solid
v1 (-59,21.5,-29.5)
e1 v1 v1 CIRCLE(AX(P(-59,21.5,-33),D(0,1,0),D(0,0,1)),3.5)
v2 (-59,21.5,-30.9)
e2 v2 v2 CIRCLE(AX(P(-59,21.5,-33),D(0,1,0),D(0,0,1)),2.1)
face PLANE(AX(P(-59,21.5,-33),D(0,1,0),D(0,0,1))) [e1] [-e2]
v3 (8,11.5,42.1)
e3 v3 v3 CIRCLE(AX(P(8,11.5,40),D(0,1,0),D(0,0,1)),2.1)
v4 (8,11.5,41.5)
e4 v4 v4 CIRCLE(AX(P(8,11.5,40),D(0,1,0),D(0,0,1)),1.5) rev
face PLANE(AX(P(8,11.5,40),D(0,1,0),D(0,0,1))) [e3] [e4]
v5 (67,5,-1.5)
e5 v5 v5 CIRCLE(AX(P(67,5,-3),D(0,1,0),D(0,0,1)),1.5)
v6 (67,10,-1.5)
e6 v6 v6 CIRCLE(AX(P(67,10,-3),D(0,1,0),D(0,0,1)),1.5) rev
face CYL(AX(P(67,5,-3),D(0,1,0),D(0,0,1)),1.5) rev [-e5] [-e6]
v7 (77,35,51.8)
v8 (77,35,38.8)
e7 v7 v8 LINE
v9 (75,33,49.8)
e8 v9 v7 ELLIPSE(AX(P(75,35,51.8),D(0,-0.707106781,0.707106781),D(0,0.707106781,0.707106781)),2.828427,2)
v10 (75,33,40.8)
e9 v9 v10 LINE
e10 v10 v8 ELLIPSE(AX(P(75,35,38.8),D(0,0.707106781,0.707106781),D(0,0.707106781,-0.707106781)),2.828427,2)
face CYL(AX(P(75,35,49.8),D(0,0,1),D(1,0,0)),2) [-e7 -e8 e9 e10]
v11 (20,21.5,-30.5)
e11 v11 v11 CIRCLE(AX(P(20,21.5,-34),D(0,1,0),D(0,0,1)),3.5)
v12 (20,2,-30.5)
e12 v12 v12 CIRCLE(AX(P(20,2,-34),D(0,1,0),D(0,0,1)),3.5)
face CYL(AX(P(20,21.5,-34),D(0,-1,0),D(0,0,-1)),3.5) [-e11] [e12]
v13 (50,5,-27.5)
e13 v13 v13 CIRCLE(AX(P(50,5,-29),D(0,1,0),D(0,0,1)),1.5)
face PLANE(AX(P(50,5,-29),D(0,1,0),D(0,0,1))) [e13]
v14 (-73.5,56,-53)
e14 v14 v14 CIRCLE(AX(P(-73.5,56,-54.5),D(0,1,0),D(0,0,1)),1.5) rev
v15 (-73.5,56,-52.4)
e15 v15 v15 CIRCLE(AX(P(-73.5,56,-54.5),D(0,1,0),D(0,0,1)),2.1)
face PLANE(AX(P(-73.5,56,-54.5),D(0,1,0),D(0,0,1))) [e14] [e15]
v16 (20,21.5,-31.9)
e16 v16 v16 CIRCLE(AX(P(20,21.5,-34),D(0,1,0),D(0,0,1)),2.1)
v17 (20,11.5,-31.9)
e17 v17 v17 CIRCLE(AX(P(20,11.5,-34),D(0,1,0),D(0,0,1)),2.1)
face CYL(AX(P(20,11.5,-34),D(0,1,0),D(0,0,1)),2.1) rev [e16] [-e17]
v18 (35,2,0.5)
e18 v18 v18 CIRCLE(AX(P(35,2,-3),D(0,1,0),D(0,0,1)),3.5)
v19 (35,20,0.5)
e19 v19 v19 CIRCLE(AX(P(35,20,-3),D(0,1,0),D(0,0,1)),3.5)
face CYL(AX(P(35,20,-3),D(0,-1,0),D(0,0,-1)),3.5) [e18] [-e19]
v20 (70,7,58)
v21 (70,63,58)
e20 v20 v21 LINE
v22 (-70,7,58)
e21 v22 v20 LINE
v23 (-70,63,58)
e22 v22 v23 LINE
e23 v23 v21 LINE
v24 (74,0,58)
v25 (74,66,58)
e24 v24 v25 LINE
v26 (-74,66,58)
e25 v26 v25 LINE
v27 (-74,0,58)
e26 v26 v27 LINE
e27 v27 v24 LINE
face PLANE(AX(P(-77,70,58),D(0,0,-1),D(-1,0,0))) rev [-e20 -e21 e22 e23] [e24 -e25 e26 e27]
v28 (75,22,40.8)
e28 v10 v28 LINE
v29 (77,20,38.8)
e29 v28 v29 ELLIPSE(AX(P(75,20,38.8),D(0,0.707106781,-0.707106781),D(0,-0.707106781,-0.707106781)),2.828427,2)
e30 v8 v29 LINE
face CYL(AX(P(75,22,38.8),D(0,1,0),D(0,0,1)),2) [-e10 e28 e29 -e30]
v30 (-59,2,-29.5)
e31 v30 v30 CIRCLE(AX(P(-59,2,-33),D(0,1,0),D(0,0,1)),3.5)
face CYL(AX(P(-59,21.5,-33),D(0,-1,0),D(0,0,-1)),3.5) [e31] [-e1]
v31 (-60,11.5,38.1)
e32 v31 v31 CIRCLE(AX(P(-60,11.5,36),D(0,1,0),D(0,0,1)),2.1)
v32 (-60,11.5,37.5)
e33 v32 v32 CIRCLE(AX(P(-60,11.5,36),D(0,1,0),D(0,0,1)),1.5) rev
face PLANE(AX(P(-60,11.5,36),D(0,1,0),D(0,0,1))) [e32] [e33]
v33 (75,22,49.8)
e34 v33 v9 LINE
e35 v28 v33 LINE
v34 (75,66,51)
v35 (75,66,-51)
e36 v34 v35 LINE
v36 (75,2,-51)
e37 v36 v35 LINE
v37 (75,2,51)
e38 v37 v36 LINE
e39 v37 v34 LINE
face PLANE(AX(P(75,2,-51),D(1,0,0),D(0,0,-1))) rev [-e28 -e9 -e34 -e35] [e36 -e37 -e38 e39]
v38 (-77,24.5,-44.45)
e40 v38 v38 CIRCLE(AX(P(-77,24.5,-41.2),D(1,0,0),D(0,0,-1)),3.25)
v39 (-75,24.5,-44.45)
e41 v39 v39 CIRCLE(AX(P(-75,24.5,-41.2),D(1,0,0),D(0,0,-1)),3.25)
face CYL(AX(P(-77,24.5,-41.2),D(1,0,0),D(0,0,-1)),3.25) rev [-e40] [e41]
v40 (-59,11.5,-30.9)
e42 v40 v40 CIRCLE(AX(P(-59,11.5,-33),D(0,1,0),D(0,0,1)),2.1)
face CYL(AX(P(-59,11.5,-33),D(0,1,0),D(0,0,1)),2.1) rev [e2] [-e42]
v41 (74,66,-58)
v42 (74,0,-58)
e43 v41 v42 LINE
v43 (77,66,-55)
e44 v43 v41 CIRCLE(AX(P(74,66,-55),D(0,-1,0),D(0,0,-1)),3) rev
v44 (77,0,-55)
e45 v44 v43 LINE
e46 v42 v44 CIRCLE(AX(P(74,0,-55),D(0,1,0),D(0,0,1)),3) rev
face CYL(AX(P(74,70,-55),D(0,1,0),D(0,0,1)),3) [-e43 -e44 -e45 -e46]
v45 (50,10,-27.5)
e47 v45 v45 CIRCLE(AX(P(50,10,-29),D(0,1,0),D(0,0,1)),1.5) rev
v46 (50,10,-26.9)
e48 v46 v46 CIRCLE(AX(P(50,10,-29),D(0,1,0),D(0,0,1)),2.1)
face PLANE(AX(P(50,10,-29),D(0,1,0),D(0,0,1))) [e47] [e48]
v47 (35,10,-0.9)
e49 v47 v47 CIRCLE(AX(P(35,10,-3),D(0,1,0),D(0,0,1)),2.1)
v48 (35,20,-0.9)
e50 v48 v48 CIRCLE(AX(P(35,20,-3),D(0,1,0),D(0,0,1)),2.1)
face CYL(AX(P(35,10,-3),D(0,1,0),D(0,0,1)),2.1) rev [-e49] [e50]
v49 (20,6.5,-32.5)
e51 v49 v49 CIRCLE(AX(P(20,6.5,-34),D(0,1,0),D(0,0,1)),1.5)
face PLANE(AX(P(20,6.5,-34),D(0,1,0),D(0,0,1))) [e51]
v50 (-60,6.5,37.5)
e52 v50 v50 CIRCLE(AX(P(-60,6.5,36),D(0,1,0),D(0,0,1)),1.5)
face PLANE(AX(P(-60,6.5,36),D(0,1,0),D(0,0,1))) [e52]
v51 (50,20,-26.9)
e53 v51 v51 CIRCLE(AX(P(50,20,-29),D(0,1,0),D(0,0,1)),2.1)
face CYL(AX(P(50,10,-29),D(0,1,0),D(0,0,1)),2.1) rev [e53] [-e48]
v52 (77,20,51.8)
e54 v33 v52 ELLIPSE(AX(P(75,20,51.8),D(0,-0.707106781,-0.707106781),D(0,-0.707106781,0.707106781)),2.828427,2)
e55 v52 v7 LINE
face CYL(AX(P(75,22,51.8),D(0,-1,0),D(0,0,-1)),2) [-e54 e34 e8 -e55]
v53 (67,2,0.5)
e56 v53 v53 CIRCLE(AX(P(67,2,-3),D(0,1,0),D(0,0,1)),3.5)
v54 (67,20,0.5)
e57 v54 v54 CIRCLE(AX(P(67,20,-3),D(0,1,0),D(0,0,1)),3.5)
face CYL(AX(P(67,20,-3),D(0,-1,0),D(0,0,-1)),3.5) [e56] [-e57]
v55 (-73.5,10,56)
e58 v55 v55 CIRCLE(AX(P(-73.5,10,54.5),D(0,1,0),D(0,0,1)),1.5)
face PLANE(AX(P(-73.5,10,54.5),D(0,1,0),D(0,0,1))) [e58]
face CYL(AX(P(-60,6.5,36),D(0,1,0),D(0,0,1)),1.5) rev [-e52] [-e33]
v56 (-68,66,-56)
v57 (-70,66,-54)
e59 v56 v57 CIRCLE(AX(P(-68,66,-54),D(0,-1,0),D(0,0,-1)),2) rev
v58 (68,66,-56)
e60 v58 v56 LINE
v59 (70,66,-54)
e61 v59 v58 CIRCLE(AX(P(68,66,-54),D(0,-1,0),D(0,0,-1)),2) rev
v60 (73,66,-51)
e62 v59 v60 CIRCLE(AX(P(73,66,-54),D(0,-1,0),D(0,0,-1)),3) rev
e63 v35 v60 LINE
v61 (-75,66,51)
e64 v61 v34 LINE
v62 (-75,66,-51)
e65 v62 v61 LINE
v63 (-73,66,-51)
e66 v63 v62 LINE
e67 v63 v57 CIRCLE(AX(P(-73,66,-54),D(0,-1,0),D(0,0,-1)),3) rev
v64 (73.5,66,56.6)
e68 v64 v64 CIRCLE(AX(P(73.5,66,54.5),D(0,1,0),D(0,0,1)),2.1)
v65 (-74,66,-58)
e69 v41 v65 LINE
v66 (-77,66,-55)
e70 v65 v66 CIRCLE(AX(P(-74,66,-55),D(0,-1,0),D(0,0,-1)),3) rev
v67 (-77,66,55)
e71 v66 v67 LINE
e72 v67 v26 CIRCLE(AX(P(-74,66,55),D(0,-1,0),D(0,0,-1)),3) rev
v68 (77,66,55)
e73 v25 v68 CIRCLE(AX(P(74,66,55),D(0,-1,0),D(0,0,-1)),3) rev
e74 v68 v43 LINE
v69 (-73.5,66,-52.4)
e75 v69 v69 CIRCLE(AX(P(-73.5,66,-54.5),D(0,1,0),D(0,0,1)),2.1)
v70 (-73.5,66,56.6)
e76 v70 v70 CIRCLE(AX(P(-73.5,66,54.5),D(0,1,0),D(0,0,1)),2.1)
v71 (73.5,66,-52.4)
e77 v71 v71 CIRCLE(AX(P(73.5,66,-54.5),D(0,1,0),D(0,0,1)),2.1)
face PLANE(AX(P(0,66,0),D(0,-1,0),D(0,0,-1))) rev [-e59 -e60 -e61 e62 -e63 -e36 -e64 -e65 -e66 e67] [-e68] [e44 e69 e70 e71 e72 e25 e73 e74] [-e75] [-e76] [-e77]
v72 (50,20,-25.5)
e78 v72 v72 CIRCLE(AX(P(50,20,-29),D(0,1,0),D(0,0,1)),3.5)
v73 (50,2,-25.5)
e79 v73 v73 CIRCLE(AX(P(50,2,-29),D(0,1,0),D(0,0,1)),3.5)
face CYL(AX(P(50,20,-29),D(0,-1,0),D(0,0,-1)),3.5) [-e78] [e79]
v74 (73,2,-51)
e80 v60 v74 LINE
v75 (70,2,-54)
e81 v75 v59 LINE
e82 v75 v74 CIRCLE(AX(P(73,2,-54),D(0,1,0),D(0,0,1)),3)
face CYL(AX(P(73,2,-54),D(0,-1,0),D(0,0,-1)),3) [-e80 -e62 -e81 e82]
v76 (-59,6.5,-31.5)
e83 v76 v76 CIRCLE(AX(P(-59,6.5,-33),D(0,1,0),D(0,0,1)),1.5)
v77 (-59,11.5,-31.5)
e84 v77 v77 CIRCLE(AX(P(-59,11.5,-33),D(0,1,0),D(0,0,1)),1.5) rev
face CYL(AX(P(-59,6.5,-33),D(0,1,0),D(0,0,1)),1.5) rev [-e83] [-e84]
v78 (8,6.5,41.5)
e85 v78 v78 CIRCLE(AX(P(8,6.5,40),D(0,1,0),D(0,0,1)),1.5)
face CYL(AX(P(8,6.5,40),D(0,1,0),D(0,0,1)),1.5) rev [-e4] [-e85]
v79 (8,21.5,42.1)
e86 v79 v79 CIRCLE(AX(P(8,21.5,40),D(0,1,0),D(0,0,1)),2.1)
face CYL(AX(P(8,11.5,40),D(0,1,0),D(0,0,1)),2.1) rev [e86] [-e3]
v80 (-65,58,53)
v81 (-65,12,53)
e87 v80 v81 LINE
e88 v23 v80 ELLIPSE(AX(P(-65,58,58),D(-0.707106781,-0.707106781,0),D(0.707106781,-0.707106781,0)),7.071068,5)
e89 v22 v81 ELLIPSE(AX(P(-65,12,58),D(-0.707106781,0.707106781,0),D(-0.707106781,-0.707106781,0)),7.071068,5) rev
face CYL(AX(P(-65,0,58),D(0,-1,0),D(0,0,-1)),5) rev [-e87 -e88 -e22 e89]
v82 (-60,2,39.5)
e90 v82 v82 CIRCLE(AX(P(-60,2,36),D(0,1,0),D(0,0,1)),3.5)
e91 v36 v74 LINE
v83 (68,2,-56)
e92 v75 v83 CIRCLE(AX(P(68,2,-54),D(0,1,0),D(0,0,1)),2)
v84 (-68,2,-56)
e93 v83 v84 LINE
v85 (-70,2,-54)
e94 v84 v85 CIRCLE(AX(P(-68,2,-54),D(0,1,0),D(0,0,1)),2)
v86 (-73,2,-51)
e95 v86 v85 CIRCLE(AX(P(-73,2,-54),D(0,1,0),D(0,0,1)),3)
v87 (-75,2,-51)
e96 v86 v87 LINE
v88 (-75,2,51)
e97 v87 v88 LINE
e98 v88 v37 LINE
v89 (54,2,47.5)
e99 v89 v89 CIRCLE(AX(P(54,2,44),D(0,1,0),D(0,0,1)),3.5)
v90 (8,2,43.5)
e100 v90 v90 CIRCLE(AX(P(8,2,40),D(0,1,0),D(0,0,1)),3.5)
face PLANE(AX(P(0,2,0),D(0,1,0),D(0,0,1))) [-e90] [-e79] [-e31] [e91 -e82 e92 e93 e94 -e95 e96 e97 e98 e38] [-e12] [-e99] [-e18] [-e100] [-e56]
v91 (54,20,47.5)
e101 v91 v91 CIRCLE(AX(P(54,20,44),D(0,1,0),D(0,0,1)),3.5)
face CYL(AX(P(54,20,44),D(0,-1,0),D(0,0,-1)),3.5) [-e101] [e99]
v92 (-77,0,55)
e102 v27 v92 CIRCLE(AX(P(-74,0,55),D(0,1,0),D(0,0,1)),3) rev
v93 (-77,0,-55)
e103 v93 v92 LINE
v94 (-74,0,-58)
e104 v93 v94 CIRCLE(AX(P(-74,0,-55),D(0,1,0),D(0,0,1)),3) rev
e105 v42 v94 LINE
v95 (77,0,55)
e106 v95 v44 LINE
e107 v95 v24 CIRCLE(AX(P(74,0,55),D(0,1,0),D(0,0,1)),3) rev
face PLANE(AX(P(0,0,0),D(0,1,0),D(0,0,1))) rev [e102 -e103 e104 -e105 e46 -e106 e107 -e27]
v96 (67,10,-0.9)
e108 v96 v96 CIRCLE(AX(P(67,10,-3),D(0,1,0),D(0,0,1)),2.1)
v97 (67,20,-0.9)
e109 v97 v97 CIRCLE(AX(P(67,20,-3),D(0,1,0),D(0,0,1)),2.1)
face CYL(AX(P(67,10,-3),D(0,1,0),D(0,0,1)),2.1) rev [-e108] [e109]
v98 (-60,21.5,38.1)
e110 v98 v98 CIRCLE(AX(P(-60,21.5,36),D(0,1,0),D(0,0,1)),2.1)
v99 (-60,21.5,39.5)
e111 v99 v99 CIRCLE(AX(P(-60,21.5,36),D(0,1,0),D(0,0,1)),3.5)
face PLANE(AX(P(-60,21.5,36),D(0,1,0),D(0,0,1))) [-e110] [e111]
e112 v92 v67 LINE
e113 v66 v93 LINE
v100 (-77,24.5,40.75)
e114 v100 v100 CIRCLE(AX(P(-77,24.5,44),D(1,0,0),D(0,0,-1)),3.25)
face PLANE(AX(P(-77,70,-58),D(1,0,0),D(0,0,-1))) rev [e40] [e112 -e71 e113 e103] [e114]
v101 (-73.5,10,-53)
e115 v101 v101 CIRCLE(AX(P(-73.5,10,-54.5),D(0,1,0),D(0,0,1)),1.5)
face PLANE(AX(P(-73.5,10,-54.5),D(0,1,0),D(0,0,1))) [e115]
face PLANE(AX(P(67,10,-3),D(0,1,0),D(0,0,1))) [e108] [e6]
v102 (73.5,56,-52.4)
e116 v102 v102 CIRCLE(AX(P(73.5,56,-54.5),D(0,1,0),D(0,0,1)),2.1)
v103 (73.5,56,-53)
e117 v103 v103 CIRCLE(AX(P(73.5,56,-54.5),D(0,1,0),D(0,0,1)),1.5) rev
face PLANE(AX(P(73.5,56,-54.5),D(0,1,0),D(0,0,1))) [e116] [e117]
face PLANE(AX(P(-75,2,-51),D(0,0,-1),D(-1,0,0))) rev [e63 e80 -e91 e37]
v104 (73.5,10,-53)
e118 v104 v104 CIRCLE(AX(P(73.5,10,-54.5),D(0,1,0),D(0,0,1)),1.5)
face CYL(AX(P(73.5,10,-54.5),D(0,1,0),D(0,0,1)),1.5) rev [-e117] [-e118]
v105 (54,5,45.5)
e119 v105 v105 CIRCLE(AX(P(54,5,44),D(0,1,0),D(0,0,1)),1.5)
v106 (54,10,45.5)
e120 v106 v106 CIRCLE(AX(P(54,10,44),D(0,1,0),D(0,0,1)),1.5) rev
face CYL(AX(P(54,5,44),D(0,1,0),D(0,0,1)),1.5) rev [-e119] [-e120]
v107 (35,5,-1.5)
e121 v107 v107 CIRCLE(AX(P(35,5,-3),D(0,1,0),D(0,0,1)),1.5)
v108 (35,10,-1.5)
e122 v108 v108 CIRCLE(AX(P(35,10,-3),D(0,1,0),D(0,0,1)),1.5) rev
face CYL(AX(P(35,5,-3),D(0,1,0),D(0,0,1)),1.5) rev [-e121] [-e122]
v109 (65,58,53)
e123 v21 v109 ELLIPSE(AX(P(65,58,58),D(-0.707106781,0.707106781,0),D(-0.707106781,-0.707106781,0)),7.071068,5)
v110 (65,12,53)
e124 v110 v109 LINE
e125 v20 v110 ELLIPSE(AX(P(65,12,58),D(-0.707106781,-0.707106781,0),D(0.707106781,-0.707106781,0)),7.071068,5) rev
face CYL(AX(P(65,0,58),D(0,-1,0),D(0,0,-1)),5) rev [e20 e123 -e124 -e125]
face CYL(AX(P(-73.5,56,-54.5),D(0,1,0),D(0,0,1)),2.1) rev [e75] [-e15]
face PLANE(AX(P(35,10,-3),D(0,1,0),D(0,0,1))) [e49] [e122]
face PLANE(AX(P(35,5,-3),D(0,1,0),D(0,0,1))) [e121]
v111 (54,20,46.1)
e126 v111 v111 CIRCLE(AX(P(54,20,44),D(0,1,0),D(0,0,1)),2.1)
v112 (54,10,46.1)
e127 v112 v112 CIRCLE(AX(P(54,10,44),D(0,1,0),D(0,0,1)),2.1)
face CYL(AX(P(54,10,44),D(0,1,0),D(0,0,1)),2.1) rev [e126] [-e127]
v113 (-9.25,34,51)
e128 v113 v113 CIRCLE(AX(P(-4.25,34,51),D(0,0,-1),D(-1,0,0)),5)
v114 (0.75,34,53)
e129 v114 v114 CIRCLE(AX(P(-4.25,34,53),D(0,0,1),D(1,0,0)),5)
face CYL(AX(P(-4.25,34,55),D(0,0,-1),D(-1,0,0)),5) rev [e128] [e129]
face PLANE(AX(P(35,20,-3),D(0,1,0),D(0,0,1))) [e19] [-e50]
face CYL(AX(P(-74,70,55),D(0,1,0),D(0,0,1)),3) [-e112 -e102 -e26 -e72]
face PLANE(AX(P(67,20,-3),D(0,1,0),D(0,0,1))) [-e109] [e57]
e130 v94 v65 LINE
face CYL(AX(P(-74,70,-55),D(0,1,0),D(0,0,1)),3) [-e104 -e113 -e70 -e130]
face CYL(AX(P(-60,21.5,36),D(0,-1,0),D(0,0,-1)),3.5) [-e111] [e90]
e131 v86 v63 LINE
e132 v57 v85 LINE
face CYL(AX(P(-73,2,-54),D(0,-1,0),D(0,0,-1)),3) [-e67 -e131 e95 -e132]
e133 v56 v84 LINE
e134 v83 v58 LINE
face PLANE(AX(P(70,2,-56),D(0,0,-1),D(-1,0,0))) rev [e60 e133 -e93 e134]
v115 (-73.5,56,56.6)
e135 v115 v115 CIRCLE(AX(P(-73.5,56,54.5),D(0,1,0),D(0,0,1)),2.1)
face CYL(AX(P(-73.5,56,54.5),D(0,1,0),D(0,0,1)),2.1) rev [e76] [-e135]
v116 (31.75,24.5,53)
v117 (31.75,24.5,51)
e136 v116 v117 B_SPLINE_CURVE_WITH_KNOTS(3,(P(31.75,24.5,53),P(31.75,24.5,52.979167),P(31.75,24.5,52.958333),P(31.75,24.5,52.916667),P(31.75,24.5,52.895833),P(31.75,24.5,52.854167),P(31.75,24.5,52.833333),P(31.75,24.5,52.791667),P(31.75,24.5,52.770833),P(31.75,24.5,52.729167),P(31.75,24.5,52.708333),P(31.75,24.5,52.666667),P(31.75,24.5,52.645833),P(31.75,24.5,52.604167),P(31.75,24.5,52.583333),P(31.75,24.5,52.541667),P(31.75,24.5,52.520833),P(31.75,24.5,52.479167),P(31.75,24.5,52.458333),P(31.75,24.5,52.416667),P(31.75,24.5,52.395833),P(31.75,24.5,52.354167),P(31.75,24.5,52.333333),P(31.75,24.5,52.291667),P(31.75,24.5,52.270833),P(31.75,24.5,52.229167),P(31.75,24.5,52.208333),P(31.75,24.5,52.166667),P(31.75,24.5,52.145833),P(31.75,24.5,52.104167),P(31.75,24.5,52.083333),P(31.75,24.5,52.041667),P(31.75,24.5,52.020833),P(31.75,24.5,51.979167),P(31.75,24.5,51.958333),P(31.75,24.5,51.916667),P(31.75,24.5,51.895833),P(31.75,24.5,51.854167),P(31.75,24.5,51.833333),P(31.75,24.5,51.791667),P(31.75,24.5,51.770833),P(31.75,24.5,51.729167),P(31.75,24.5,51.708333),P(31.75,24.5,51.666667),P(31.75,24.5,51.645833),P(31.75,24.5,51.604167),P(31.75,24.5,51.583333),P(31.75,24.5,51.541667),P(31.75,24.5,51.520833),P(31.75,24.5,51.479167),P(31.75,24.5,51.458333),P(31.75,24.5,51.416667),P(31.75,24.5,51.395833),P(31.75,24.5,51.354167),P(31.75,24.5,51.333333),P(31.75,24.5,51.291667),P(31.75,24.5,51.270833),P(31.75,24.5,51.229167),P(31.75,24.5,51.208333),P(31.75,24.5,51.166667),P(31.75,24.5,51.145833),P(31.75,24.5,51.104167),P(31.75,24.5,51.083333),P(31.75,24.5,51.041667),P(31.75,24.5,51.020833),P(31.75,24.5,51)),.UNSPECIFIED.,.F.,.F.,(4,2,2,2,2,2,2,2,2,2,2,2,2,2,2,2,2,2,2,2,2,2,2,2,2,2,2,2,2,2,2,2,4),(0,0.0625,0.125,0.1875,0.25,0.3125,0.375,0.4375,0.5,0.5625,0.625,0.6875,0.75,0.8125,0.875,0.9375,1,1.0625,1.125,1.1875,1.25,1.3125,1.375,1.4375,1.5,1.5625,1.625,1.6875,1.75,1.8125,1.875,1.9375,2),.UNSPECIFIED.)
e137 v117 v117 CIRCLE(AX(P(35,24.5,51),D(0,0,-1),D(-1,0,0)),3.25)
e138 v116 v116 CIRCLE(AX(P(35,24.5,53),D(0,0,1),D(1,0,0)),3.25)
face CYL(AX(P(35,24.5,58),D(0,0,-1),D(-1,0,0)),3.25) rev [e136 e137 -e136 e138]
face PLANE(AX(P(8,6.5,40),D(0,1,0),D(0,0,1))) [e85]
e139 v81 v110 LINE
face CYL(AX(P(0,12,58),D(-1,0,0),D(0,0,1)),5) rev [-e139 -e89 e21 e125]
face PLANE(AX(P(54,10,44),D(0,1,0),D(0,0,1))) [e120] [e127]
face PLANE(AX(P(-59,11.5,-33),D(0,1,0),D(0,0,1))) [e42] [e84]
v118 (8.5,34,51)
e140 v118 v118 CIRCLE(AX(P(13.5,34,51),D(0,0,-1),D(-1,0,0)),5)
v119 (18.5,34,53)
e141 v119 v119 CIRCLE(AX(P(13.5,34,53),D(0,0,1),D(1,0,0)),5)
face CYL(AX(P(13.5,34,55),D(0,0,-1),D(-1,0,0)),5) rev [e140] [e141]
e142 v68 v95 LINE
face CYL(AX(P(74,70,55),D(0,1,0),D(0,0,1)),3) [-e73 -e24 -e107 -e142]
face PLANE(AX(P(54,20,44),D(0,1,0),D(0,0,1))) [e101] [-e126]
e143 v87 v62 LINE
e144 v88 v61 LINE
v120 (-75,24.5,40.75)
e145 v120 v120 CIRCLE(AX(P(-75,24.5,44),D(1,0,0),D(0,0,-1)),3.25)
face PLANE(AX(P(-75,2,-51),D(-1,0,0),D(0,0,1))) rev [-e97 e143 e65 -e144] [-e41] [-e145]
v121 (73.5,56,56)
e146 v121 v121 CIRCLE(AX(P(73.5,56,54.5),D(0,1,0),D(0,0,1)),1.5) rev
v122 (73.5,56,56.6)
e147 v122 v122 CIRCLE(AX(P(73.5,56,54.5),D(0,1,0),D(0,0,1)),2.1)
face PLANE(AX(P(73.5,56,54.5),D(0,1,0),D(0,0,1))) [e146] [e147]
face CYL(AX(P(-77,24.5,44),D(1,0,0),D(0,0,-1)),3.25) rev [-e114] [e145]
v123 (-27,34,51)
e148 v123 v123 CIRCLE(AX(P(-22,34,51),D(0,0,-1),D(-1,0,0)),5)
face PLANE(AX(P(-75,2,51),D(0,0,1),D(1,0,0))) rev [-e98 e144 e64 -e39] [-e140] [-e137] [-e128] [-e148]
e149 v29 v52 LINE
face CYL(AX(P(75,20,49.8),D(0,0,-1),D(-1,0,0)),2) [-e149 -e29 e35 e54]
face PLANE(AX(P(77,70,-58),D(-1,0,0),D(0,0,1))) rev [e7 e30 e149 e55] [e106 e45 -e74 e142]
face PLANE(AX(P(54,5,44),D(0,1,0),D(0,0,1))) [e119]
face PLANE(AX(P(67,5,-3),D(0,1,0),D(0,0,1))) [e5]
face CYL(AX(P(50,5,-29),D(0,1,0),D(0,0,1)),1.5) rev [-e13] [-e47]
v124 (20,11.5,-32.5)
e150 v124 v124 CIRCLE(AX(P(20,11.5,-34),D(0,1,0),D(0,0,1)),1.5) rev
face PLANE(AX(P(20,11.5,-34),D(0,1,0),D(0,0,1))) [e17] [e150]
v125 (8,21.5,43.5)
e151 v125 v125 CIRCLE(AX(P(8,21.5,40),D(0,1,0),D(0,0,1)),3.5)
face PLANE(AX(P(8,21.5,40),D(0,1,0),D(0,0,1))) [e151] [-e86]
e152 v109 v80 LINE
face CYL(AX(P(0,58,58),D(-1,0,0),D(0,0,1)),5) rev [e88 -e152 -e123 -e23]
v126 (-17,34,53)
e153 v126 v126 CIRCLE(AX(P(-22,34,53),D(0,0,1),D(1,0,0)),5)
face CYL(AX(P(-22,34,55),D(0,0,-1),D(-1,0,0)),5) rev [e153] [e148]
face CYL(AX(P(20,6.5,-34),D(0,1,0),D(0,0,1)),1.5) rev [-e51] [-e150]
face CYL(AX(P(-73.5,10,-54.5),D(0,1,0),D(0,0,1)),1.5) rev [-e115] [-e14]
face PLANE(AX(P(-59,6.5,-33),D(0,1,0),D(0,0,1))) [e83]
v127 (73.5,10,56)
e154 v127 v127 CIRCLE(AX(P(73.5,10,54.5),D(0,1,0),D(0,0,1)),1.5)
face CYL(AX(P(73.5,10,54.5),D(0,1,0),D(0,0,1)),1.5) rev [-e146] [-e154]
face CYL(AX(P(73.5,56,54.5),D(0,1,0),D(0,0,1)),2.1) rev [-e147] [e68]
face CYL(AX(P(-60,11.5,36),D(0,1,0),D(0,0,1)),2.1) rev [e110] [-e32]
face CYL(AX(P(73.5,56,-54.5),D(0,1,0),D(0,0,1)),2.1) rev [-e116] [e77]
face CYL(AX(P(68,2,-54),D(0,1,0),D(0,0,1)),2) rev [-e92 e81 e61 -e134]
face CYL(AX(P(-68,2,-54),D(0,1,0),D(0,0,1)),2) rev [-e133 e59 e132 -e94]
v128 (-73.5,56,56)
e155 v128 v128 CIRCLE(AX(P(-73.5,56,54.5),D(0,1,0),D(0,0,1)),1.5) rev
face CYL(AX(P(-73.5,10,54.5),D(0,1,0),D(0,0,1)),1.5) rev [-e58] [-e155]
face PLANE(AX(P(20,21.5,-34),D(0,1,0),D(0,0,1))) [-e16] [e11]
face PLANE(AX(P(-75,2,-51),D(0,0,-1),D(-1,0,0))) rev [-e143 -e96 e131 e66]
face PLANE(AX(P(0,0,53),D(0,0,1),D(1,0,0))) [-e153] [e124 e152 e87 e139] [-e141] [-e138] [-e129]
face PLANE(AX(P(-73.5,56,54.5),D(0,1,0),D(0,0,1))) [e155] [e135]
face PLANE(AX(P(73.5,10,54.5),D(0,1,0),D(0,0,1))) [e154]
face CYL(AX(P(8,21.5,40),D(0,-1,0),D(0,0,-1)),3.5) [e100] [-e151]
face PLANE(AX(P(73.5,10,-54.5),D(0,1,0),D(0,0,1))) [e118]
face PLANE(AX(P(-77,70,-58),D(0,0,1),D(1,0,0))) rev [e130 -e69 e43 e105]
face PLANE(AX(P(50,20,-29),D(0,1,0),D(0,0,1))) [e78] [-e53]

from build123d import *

# Parameters (mm, degrees)
SKETCH1_W           = 154
SKETCH1_H           = 116
BOSS_EXTRUDE1_DEPTH = 70
SKETCH2_W           = 150
SKETCH2_H           = 102
CUT_EXTRUDE1_DEPTH  = 68
SKETCH3_W           = 140
SKETCH3_H           = 5
CUT_EXTRUDE2_DEPTH  = 68
SKETCH5_W           = 70
SKETCH5_H           = 56
CUT_EXTRUDE4_DEPTH  = 5
SKETCH17_W          = 9
SKETCH17_H          = 11
CUT_EXTRUDE12_DEPTH = 178.110135227
FILLET1_R           = 2
FILLET3_R           = 5
FILLET4_R           = 3
FILLET5_R           = 3
FILLET6_R           = 3
FILLET7_R           = 3
FILLET9_R           = 3
FILLET11_R          = 2
FILLET12_R          = 3
FILLET13_R          = 2
SKETCH18_W          = 154
SKETCH18_H          = 116
CUT_EXTRUDE13_DEPTH = 4
SKETCH19_R          = 5
CUT_EXTRUDE14_DEPTH = 4
SKETCH20_R          = 3.5
BOSS_EXTRUDE3_DEPTH = 19.5
SKETCH22_R          = 3.5
BOSS_EXTRUDE4_DEPTH = 18
SKETCH24_R          = 3.25
CUT_EXTRUDE17_DEPTH = 149.882504009
SKETCH25_R          = 3.25
CUT_EXTRUDE18_DEPTH = 176.567650779
SKETCH6_R           = 1.5
CUT_EXTRUDE19_DEPTH = 60
SKETCH26_R          = 2.1
CUT_EXTRUDE20_DEPTH = 10
SKETCH23_R          = 1.5
CUT_EXTRUDE21_DEPTH = 15
SKETCH27_R          = 2.1
CUT_EXTRUDE22_DEPTH = 10
SKETCH21_R          = 1.5
CUT_EXTRUDE23_DEPTH = 15
SKETCH28_R          = 2.1
CUT_EXTRUDE24_DEPTH = 10


with BuildPart() as part:
    # Sketch1 → Boss-Extrude1 (new body)
    with BuildSketch(Plane(origin=(0, 0, 0), x_dir=(1, 0, 0), z_dir=(0, 1, 0))):
        Rectangle(SKETCH1_W, SKETCH1_H)
    extrude(amount=BOSS_EXTRUDE1_DEPTH)

    # Sketch2 → Cut-Extrude1 (cut)
    with BuildSketch(Plane(origin=(0, 70, 0), x_dir=(1, 0, 0), z_dir=(0, 1, 0))):
        Rectangle(SKETCH2_W, SKETCH2_H)
    extrude(amount=-CUT_EXTRUDE1_DEPTH, mode=Mode.SUBTRACT)

    # Sketch3 → Cut-Extrude2 (cut)
    with BuildSketch(Plane(origin=(0, 70, 0), x_dir=(1, 0, 0), z_dir=(0, 1, 0))):
        with Locations((0, 53.5)):
            Rectangle(SKETCH3_W, SKETCH3_H)
    extrude(amount=-CUT_EXTRUDE2_DEPTH, mode=Mode.SUBTRACT)

    # Sketch5 → Cut-Extrude4 (cut)
    with BuildSketch(Plane.XY.offset(58)):
        with Locations((35, 35)):
            Rectangle(SKETCH5_W, SKETCH5_H)
        with Locations((-35, 35)):
            Rectangle(SKETCH5_W, SKETCH5_H)
    extrude(amount=-CUT_EXTRUDE4_DEPTH, mode=Mode.SUBTRACT)

    # Sketch17 → Cut-Extrude12 (cut, through all)
    with BuildSketch(Plane.ZY.offset(-75)):
        with Locations((45.3, 27.5)):
            Rectangle(SKETCH17_W, SKETCH17_H)
    extrude(amount=-CUT_EXTRUDE12_DEPTH, mode=Mode.SUBTRACT)

    # Fillet1
    fillet1_edges = [part.edges().sort_by_distance(p)[0] for p in [
        (77, 27.5, 49.8),
        (77, 22, 45.3),
        (77, 27.5, 40.8),
        (77, 33, 45.3),
    ]]
    fillet(fillet1_edges, radius=FILLET1_R - 0.0001)  # a hair under: the kernel refuses the full size

    # Fillet3
    fillet3_edges = [part.edges().sort_by_distance(p)[0] for p in [
        (0, 7, 53),
        (70, 35, 53),
        (-70, 35, 53),
        (0, 63, 53),
    ]]
    fillet(fillet3_edges, radius=FILLET3_R - 0.0001)  # a hair under: the kernel refuses the full size

    # Fillet4
    fillet4_edges = [part.edges().sort_by_distance(p)[0] for p in [
        (77, 35, 58),
    ]]
    fillet(fillet4_edges, radius=FILLET4_R)

    # Fillet5
    fillet5_edges = [part.edges().sort_by_distance(p)[0] for p in [
        (-77, 35, 58),
    ]]
    fillet(fillet5_edges, radius=FILLET5_R)

    # Fillet6
    fillet6_edges = [part.edges().sort_by_distance(p)[0] for p in [
        (-77, 35, -58),
    ]]
    fillet(fillet6_edges, radius=FILLET6_R)

    # Fillet7
    fillet7_edges = [part.edges().sort_by_distance(p)[0] for p in [
        (77, 35, -58),
    ]]
    fillet(fillet7_edges, radius=FILLET7_R)

    # Fillet9
    fillet9_edges = [part.edges().sort_by_distance(p)[0] for p in [
        (-70, 36, -51),
    ]]
    fillet(fillet9_edges, radius=FILLET9_R)

    # Fillet11
    fillet11_edges = [part.edges().sort_by_distance(p)[0] for p in [
        (-70, 36, -56),
    ]]
    fillet(fillet11_edges, radius=FILLET11_R - 0.0001)  # a hair under: the kernel refuses the full size

    # Fillet12
    fillet12_edges = [part.edges().sort_by_distance(p)[0] for p in [
        (70, 36, -51),
    ]]
    fillet(fillet12_edges, radius=FILLET12_R)

    # Fillet13
    fillet13_edges = [part.edges().sort_by_distance(p)[0] for p in [
        (70, 36, -56),
    ]]
    fillet(fillet13_edges, radius=FILLET13_R - 0.0001)  # a hair under: the kernel refuses the full size

    # Sketch18 → Cut-Extrude13 (cut)
    with BuildSketch(Plane(origin=(0, 70, 0), x_dir=(1, 0, 0), z_dir=(0, 1, 0))):
        Rectangle(SKETCH18_W, SKETCH18_H)
    extrude(amount=-CUT_EXTRUDE13_DEPTH, mode=Mode.SUBTRACT)

    # Sketch19 → Cut-Extrude14 (cut)
    with BuildSketch(Plane(origin=(0, 0, 51), x_dir=(-1, 0, 0), z_dir=(0, 0, -1))):
        with Locations((-13.5, 34)):
            Circle(SKETCH19_R)
        with Locations((4.25, 34)):
            Circle(SKETCH19_R)
        with Locations((22, 34)):
            Circle(SKETCH19_R)
    extrude(amount=-CUT_EXTRUDE14_DEPTH, mode=Mode.SUBTRACT)

    # Sketch20 → Boss-Extrude3 (add)
    with BuildSketch(Plane(origin=(0, 2, 0), x_dir=(1, 0, 0), z_dir=(0, 1, 0))):
        with Locations(Location((-60, -36, 0), (0, 0, 270))):
            Circle(SKETCH20_R)
        with Locations(Location((8, -40, 0), (0, 0, 270))):
            Circle(SKETCH20_R)
        with Locations(Location((-59, 33, 0), (0, 0, 270))):
            Circle(SKETCH20_R)
        with Locations(Location((20, 34, 0), (0, 0, 270))):
            Circle(SKETCH20_R)
    extrude(amount=BOSS_EXTRUDE3_DEPTH)

    # Sketch22 → Boss-Extrude4 (add)
    with BuildSketch(Plane(origin=(0, 2, 0), x_dir=(1, 0, 0), z_dir=(0, 1, 0))):
        with Locations(Location((50, 29, 0), (0, 0, 270))):
            Circle(SKETCH22_R)
        with Locations(Location((35, 3, 0), (0, 0, 270))):
            Circle(SKETCH22_R)
        with Locations(Location((67, 3, 0), (0, 0, 270))):
            Circle(SKETCH22_R)
        with Locations(Location((54, -44, 0), (0, 0, 270))):
            Circle(SKETCH22_R)
    extrude(amount=BOSS_EXTRUDE4_DEPTH)

    # Sketch24 → Cut-Extrude17 (cut, through all)
    with BuildSketch(Plane(origin=(0, 0, 51), x_dir=(-1, 0, 0), z_dir=(0, 0, -1))):
        with Locations((-35, 24.5)):
            Circle(SKETCH24_R)
    extrude(amount=-CUT_EXTRUDE17_DEPTH, mode=Mode.SUBTRACT)

    # Sketch25 → Cut-Extrude18 (cut, through all)
    with BuildSketch(Plane(origin=(-75, 0, 0), x_dir=(0, 0, -1), z_dir=(1, 0, 0))):
        with Locations((-44, 24.5)):
            Circle(SKETCH25_R)
        with Locations((41.2, 24.5)):
            Circle(SKETCH25_R)
    extrude(amount=-CUT_EXTRUDE18_DEPTH, mode=Mode.SUBTRACT)

    # Sketch6 → Cut-Extrude19 (cut)
    with BuildSketch(Plane(origin=(0, 70, 0), x_dir=(1, 0, 0), z_dir=(0, 1, 0))):
        with Locations(Location((73.5, 54.5, 0), (0, 0, 270))):
            Circle(SKETCH6_R)
        with Locations(Location((-73.5, 54.5, 0), (0, 0, 270))):
            Circle(SKETCH6_R)
        with Locations(Location((73.5, -54.5, 0), (0, 0, 270))):
            Circle(SKETCH6_R)
        with Locations(Location((-73.5, -54.5, 0), (0, 0, 270))):
            Circle(SKETCH6_R)
    extrude(amount=-CUT_EXTRUDE19_DEPTH, mode=Mode.SUBTRACT)

    # Sketch26 → Cut-Extrude20 (cut)
    with BuildSketch(Plane(origin=(0, 66, 0), x_dir=(1, 0, 0), z_dir=(0, 1, 0))):
        with Locations(Location((73.5, -54.5, 0), (0, 0, 270))):
            Circle(SKETCH26_R)
        with Locations(Location((73.5, 54.5, 0), (0, 0, 270))):
            Circle(SKETCH26_R)
        with Locations(Location((-73.5, 54.5, 0), (0, 0, 270))):
            Circle(SKETCH26_R)
        with Locations(Location((-73.5, -54.5, 0), (0, 0, 270))):
            Circle(SKETCH26_R)
    extrude(amount=-CUT_EXTRUDE20_DEPTH, mode=Mode.SUBTRACT)

    # Sketch23 → Cut-Extrude21 (cut)
    with BuildSketch(Plane(origin=(0, 20, 0), x_dir=(1, 0, 0), z_dir=(0, 1, 0))):
        with Locations(Location((35, 3, 0), (0, 0, 270))):
            Circle(SKETCH23_R)
        with Locations(Location((50, 29, 0), (0, 0, 270))):
            Circle(SKETCH23_R)
        with Locations(Location((67, 3, 0), (0, 0, 270))):
            Circle(SKETCH23_R)
        with Locations(Location((54, -44, 0), (0, 0, 270))):
            Circle(SKETCH23_R)
    extrude(amount=-CUT_EXTRUDE21_DEPTH, mode=Mode.SUBTRACT)

    # Sketch27 → Cut-Extrude22 (cut)
    with BuildSketch(Plane(origin=(0, 20, 0), x_dir=(1, 0, 0), z_dir=(0, 1, 0))):
        with Locations(Location((54, -44, 0), (0, 0, 270))):
            Circle(SKETCH27_R)
        with Locations(Location((35, 3, 0), (0, 0, 270))):
            Circle(SKETCH27_R)
        with Locations(Location((50, 29, 0), (0, 0, 270))):
            Circle(SKETCH27_R)
        with Locations(Location((67, 3, 0), (0, 0, 270))):
            Circle(SKETCH27_R)
    extrude(amount=-CUT_EXTRUDE22_DEPTH, mode=Mode.SUBTRACT)

    # Sketch21 → Cut-Extrude23 (cut)
    with BuildSketch(Plane(origin=(0, 21.5, 0), x_dir=(1, 0, 0), z_dir=(0, 1, 0))):
        with Locations(Location((-59, 33, 0), (0, 0, 270))):
            Circle(SKETCH21_R)
        with Locations(Location((20, 34, 0), (0, 0, 270))):
            Circle(SKETCH21_R)
        with Locations(Location((8, -40, 0), (0, 0, 270))):
            Circle(SKETCH21_R)
        with Locations(Location((-60, -36, 0), (0, 0, 270))):
            Circle(SKETCH21_R)
    extrude(amount=-CUT_EXTRUDE23_DEPTH, mode=Mode.SUBTRACT)

    # Sketch28 → Cut-Extrude24 (cut)
    with BuildSketch(Plane(origin=(0, 21.5, 0), x_dir=(1, 0, 0), z_dir=(0, 1, 0))):
        with Locations(Location((-59, 33, 0), (0, 0, 270))):
            Circle(SKETCH28_R)
        with Locations(Location((-60, -36, 0), (0, 0, 270))):
            Circle(SKETCH28_R)
        with Locations(Location((8, -40, 0), (0, 0, 270))):
            Circle(SKETCH28_R)
        with Locations(Location((20, 34, 0), (0, 0, 270))):
            Circle(SKETCH28_R)
    extrude(amount=-CUT_EXTRUDE24_DEPTH, mode=Mode.SUBTRACT)


solid = part.part
